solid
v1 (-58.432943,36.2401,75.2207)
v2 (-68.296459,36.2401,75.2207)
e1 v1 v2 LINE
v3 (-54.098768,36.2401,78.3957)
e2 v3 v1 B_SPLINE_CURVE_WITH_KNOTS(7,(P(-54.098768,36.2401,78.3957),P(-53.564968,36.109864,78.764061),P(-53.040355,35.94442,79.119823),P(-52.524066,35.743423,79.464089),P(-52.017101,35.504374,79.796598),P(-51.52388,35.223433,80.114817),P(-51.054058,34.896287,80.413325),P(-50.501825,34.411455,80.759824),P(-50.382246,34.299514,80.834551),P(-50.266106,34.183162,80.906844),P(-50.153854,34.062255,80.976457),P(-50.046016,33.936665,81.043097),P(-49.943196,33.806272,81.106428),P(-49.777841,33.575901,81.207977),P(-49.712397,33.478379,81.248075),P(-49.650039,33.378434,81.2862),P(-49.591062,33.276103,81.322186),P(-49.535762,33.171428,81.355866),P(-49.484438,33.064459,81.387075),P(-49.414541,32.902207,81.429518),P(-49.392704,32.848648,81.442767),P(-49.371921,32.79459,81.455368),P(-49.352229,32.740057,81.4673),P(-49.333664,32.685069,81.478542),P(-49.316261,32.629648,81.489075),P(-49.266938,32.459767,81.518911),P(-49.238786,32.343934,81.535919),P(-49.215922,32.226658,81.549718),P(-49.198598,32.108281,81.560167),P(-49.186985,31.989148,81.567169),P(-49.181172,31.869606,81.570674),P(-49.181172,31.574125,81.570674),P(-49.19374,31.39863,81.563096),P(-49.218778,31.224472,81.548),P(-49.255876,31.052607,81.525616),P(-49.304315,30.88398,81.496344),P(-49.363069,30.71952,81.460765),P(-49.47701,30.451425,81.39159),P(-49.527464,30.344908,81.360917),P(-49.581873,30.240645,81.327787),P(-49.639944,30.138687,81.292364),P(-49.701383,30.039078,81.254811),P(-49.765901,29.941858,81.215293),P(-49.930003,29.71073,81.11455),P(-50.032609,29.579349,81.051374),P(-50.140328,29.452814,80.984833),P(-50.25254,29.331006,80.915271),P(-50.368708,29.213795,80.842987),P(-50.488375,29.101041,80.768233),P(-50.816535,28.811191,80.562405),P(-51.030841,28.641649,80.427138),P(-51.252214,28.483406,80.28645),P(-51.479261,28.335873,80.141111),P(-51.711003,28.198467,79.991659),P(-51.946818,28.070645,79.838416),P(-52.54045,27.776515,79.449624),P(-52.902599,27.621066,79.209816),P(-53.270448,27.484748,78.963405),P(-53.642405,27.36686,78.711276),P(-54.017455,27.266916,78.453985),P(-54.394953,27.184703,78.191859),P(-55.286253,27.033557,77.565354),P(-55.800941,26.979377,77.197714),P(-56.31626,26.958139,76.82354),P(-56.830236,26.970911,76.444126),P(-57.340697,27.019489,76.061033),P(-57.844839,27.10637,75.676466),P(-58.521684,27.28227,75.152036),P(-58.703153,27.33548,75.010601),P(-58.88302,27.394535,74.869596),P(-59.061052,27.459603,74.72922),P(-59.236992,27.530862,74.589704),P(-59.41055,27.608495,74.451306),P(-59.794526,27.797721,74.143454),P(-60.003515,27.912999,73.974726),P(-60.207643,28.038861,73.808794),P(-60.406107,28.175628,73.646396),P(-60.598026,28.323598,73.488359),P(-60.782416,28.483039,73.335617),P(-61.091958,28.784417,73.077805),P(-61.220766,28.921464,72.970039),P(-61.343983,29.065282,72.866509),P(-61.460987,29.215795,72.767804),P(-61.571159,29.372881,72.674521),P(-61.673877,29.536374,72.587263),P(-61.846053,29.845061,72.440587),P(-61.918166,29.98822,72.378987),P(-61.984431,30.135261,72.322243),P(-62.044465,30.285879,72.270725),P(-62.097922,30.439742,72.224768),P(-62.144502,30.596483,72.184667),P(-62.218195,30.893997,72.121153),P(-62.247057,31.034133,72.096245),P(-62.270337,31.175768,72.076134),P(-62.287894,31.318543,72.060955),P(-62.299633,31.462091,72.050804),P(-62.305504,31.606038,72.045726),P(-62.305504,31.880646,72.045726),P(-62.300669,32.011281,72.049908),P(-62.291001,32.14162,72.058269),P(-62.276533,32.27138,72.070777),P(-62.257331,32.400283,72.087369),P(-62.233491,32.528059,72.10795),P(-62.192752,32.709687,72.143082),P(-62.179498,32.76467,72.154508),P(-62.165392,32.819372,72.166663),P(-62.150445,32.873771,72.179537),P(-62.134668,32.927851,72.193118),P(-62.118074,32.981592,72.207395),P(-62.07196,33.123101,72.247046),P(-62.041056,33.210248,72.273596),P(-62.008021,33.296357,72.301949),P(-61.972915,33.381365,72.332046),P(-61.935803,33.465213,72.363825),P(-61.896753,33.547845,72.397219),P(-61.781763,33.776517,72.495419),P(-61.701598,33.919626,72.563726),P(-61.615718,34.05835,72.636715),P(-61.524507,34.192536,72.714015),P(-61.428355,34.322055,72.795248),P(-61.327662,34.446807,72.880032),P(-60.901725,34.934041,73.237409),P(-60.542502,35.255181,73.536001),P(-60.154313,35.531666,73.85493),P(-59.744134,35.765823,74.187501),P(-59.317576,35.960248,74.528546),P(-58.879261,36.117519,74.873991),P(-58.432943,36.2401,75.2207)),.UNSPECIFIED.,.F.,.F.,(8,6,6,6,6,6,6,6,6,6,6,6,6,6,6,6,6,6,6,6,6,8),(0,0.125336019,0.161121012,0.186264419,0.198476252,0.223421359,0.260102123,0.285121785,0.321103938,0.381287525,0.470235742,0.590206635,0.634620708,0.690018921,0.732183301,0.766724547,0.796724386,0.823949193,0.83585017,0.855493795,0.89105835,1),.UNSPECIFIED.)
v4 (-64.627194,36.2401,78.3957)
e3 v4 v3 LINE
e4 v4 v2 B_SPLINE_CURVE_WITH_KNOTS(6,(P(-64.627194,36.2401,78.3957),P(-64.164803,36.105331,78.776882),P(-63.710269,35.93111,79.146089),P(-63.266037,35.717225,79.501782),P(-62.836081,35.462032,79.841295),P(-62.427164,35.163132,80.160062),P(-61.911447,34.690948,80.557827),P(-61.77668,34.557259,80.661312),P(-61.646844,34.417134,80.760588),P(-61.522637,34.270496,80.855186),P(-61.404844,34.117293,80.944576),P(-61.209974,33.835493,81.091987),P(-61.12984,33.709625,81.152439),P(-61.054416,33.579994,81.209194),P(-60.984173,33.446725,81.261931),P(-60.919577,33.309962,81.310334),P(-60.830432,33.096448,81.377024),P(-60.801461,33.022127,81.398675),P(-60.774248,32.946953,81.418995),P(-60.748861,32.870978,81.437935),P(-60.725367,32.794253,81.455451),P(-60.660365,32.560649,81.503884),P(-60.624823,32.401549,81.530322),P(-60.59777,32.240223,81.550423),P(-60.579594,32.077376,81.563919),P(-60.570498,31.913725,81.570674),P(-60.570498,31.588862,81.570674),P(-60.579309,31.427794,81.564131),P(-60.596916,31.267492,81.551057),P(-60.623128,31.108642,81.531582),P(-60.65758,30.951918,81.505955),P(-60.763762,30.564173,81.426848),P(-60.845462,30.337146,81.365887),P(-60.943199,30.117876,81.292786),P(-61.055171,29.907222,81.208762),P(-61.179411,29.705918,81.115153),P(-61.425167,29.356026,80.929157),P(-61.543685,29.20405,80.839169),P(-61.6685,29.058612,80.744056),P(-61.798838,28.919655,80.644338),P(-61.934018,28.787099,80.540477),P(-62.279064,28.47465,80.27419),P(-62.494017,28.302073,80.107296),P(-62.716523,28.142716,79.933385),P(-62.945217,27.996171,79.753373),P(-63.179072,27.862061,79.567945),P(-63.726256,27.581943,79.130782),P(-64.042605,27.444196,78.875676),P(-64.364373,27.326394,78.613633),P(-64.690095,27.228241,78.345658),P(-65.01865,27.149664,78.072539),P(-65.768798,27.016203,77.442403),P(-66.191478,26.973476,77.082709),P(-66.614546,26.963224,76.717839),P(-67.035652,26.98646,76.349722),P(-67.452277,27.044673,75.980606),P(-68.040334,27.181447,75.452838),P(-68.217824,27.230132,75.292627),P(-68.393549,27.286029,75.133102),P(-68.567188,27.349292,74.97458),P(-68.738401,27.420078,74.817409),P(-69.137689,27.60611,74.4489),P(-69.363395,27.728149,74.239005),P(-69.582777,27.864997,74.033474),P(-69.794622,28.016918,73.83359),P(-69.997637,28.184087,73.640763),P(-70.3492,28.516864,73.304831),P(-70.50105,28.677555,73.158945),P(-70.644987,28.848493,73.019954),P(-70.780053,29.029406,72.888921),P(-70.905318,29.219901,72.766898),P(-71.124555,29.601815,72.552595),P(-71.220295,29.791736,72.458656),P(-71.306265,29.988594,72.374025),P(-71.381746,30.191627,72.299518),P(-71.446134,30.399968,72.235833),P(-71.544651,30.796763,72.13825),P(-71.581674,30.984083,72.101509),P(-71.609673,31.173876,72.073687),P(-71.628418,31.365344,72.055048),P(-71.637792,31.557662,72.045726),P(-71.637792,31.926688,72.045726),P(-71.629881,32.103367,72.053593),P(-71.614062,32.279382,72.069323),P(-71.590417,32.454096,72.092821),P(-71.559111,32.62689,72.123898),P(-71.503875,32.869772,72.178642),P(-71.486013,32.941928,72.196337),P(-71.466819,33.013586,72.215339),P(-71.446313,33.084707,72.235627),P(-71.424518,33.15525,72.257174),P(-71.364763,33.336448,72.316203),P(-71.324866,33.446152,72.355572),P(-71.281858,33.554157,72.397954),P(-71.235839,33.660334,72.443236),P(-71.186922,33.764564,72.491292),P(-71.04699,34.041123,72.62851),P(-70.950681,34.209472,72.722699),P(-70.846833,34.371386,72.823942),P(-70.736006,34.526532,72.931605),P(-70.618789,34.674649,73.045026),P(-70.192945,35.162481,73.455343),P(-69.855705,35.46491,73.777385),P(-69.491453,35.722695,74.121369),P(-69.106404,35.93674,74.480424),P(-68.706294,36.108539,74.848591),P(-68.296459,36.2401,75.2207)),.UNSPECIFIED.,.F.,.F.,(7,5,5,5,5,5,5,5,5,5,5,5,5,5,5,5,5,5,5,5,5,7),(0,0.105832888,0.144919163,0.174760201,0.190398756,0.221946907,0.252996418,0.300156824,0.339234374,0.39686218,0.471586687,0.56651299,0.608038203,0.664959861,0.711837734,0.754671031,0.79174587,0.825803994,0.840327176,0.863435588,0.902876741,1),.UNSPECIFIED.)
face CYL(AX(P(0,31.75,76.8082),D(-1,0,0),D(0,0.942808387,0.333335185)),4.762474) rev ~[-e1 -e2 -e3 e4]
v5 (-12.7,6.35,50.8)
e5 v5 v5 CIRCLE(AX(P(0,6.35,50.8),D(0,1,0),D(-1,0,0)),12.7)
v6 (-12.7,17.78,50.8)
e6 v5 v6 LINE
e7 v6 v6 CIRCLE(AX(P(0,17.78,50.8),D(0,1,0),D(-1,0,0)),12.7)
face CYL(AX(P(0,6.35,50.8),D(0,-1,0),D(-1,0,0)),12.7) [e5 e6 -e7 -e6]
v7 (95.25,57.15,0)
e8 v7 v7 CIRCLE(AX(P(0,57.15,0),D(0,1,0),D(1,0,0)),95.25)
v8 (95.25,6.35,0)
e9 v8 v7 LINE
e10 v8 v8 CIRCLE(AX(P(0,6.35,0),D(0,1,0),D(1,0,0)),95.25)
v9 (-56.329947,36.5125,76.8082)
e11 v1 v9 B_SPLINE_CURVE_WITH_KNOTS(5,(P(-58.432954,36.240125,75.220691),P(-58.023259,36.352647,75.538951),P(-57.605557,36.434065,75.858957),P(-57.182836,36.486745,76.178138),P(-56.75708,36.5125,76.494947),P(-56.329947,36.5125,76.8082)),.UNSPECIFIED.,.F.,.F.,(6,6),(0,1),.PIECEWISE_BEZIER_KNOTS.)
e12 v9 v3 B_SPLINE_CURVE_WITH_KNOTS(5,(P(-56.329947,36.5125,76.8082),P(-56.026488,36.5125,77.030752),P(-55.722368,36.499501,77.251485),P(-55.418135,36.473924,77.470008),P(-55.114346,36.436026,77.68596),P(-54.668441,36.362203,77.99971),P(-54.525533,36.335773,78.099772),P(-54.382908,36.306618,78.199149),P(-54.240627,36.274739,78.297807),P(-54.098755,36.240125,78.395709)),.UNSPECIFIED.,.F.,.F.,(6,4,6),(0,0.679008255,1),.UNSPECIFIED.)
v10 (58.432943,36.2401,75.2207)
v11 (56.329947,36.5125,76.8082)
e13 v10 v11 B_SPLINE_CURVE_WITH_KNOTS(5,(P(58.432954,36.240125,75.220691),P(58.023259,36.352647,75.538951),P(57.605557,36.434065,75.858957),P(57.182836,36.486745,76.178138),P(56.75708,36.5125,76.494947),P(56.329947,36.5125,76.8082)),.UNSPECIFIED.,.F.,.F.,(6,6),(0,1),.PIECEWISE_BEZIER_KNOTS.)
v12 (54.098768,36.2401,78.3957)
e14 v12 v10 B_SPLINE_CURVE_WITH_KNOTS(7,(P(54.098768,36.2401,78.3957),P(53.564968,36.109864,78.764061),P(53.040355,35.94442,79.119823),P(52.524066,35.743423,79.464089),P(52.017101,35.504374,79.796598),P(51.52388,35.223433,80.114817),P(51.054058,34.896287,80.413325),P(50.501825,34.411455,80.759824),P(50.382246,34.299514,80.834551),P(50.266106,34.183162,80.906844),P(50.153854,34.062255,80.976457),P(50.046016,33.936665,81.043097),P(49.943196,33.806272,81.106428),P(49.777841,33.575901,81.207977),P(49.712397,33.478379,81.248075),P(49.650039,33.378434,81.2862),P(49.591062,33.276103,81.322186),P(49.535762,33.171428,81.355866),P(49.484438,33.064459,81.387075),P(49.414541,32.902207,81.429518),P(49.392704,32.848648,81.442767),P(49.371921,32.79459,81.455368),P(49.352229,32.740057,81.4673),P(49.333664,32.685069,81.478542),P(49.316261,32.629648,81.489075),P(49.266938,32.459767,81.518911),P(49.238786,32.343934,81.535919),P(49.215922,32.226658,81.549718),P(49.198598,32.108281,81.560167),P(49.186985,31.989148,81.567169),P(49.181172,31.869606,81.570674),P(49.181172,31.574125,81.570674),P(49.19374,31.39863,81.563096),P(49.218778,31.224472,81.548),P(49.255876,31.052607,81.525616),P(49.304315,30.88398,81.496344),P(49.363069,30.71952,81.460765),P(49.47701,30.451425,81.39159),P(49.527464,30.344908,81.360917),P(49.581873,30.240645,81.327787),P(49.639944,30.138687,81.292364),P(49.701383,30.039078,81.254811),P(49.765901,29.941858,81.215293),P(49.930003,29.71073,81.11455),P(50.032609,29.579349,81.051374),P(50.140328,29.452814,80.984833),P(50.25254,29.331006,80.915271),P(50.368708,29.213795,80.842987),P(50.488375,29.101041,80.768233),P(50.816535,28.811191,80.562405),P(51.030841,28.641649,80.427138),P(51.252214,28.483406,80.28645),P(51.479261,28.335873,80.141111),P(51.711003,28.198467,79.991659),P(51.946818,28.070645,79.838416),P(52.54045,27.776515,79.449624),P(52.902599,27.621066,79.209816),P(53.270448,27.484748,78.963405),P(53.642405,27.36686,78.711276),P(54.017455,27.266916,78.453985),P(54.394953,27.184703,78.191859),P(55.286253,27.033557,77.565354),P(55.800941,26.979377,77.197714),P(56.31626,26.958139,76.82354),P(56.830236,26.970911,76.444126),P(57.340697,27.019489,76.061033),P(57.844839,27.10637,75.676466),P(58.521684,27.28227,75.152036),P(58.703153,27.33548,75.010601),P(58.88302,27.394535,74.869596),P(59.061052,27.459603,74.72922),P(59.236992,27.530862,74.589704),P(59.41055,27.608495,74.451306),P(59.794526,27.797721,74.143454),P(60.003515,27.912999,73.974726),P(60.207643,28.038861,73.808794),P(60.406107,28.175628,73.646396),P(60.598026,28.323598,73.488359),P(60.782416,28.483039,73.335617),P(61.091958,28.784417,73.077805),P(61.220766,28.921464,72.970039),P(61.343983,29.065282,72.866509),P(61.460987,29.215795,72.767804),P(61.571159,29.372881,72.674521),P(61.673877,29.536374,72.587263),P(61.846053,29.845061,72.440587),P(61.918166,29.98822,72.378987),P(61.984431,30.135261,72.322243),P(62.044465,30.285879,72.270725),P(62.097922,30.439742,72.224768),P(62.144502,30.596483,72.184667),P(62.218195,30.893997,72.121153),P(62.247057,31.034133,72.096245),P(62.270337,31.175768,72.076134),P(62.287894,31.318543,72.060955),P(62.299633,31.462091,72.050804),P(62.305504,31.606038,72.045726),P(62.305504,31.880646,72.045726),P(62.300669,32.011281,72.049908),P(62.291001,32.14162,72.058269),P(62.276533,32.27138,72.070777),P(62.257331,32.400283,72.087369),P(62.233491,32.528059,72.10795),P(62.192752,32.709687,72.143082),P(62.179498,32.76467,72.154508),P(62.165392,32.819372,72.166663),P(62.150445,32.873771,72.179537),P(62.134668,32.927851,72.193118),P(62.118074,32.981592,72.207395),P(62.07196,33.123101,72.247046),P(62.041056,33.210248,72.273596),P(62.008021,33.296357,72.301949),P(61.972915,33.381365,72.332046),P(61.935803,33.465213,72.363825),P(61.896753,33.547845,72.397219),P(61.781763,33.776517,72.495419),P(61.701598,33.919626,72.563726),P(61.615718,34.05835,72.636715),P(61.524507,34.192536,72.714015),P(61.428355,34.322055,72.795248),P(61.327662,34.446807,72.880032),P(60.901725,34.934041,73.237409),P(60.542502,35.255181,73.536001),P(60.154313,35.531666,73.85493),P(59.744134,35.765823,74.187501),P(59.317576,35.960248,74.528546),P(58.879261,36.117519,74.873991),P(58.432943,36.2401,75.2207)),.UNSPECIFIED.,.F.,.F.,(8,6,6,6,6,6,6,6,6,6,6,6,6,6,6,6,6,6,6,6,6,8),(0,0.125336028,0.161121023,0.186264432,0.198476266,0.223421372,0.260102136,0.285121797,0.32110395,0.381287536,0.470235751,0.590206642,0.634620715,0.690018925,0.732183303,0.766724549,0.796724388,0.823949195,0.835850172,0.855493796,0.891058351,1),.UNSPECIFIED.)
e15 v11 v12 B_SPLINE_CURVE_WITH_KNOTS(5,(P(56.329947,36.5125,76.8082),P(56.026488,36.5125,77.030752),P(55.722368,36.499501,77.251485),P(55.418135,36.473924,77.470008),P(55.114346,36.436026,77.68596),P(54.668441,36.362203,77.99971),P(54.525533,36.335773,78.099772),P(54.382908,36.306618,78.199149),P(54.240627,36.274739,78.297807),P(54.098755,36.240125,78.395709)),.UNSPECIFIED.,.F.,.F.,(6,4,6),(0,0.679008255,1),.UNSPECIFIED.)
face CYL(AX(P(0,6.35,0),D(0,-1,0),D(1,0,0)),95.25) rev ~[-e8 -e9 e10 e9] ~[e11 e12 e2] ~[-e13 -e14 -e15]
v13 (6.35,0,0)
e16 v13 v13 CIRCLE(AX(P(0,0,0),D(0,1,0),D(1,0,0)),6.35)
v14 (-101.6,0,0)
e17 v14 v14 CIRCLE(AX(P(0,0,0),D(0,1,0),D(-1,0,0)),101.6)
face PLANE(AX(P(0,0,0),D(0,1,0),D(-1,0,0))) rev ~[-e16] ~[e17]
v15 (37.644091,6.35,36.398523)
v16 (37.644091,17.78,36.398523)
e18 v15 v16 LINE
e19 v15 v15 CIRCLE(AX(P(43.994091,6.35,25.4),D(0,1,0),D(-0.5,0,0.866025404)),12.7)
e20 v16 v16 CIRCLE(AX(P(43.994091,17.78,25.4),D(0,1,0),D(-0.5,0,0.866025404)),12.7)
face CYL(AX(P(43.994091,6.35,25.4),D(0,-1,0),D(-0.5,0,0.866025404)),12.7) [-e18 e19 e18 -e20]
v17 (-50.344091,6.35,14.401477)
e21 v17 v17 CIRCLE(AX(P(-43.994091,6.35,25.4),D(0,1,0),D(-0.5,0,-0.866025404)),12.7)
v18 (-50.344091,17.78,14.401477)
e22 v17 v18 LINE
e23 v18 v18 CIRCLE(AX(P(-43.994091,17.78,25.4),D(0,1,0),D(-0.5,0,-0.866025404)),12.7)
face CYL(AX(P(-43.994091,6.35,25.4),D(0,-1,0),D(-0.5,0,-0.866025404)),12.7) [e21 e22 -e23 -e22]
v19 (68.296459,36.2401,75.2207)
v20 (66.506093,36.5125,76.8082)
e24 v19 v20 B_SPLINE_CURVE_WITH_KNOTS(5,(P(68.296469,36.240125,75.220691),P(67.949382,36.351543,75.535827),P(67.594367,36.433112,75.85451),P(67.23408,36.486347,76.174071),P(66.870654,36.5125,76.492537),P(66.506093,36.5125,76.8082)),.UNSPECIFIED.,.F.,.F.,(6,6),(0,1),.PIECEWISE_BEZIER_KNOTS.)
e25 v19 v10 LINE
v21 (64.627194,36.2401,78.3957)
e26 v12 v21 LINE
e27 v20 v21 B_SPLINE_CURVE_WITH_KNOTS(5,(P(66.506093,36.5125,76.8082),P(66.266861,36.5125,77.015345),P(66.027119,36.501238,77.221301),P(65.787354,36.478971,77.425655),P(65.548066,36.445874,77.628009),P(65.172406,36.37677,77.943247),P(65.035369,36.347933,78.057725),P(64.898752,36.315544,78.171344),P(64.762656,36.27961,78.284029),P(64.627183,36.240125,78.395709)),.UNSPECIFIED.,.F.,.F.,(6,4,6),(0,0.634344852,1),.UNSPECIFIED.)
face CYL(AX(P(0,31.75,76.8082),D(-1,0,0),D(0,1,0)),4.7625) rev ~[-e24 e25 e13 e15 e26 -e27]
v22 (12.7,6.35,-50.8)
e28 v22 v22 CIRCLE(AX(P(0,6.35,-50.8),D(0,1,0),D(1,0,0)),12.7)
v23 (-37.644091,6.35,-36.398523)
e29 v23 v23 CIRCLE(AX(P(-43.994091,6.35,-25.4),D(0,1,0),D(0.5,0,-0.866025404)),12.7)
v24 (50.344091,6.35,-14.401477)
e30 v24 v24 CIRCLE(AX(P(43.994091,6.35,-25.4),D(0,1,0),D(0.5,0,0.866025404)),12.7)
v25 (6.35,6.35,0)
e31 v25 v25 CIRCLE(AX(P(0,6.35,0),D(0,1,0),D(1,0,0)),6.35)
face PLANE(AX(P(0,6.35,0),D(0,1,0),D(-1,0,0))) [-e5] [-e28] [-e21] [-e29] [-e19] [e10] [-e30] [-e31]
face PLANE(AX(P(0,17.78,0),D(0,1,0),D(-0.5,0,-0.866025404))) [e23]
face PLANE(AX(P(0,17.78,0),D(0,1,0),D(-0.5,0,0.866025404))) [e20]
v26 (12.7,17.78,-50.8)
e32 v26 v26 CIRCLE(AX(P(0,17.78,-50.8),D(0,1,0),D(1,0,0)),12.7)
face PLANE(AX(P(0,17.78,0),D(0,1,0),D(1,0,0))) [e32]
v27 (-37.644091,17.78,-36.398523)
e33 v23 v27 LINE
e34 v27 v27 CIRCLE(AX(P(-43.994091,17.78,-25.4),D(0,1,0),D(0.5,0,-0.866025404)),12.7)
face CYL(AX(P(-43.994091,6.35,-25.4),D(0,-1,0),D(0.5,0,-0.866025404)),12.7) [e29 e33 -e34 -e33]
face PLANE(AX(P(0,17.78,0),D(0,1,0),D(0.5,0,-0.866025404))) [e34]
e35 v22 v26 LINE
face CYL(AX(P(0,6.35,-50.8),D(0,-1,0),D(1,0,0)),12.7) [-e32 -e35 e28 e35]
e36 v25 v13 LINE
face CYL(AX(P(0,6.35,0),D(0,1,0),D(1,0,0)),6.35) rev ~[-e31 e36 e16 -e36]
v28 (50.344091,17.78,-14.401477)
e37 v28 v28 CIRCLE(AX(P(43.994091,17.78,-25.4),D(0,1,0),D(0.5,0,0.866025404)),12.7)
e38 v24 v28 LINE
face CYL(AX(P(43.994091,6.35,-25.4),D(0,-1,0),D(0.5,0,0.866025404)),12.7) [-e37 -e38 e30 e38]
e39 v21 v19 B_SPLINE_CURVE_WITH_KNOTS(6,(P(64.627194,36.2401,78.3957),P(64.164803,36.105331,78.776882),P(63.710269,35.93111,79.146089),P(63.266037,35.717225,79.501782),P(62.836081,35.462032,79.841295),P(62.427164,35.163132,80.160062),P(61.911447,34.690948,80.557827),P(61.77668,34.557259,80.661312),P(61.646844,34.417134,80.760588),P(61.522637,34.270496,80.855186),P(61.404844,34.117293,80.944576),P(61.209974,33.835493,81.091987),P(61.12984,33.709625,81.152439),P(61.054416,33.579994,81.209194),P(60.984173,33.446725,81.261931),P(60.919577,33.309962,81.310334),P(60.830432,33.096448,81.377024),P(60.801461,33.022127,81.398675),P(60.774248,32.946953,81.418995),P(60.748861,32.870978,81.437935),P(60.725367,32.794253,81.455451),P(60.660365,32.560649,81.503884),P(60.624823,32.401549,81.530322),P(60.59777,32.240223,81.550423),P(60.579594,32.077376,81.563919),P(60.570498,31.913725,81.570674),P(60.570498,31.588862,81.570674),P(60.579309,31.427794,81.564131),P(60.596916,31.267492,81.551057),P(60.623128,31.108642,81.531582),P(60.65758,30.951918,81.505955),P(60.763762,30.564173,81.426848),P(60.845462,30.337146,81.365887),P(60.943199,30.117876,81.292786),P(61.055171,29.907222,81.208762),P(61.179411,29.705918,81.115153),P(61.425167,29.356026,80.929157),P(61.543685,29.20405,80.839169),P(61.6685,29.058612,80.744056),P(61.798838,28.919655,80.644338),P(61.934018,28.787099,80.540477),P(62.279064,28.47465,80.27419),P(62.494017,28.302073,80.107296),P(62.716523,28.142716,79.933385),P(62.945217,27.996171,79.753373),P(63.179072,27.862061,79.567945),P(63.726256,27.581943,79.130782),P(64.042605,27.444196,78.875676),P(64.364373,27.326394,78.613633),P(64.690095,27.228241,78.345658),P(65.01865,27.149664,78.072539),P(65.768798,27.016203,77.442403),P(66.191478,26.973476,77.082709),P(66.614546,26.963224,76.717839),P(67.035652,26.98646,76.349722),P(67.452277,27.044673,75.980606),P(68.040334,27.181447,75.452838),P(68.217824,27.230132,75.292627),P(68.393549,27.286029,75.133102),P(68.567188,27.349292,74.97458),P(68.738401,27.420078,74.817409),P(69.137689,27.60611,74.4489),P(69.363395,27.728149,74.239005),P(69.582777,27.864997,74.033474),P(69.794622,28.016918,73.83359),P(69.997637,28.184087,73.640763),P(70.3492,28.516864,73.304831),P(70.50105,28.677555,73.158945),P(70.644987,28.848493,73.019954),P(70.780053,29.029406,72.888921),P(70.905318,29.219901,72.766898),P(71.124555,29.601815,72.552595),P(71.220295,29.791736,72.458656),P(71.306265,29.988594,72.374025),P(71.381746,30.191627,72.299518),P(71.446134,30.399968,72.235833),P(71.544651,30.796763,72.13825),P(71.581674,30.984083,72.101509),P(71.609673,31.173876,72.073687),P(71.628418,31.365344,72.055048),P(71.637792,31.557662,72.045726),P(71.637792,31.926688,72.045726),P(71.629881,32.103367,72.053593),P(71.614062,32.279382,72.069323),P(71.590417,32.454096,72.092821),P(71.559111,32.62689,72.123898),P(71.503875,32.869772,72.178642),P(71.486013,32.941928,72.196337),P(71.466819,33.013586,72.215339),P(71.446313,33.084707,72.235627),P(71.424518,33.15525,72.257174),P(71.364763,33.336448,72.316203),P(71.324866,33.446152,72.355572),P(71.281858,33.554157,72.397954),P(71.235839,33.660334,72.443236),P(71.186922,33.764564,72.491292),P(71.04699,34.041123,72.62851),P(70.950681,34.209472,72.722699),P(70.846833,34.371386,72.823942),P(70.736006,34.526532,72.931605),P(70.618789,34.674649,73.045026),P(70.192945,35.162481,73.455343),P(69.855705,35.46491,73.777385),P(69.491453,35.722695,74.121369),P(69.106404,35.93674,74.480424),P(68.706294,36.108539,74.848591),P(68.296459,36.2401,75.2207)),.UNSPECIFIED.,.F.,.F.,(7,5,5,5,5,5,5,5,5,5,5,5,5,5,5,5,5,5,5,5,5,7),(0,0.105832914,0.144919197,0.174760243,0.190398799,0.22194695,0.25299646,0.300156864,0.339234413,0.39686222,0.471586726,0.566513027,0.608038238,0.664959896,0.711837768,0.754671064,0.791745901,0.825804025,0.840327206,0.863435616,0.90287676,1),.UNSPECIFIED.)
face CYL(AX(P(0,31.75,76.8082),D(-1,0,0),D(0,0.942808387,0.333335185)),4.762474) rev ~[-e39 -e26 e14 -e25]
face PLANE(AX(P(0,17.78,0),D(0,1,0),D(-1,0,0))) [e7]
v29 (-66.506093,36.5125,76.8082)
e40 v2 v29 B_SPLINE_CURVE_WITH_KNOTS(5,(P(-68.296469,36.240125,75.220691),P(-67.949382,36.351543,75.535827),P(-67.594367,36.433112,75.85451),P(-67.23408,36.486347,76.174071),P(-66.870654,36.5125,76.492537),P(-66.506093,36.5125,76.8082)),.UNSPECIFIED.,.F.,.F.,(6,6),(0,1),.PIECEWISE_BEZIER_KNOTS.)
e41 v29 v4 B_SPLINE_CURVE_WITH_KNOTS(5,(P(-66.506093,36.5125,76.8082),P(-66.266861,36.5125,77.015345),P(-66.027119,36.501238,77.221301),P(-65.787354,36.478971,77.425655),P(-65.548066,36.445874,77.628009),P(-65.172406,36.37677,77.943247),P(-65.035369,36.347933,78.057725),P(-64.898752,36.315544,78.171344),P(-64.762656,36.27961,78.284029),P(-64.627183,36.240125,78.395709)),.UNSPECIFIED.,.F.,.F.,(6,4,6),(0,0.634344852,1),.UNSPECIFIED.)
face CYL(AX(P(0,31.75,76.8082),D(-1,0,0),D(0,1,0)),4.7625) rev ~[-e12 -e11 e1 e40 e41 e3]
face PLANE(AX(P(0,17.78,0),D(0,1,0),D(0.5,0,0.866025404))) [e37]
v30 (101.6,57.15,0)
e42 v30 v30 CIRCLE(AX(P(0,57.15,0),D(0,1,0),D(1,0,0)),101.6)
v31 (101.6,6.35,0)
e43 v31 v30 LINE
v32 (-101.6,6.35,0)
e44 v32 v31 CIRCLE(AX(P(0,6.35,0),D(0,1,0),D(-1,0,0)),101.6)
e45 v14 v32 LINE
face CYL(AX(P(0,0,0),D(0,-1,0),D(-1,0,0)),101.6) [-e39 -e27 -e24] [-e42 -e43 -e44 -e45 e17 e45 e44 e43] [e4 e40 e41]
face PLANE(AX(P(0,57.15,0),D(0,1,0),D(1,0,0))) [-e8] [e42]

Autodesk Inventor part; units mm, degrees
ref_plane "YZ Plane" through (0, 0, 0) normal (1, 0, 0) x (0, 1, 0)
ref_plane "XZ Plane" through (0, 0, 0) normal (0, 1, 0) x (-1, 0, 0)
ref_plane "XY Plane" through (0, 0, 0) normal (0, 0, 1) x (1, 0, 0)
sketch "Sketch1" plane through (0, 0, 0) normal (0, 1, 0) x (-1, 0, 0)
  circle A0 centre (0, 0) radius 101.6
  dimension "baseOutsideDiameter" = 203.2
extrude "Extrusion1" add sketch "Sketch1" along normal blind 6.35
sketch "Sketch2" plane through (0, 6.35, 0) normal (0, 1, 0) x (1, 0, 0)
  circle A0 centre (0, 0) radius 101.6
  circle A1 centre (0, 0) radius 95.25
  dimension "d4" = 6.35
  dimension "d5" = 203.2
extrude "Extrusion2" add sketch "Sketch2" along normal blind 50.8
sketch "Sketch3" plane through (0, 6.35, 0) normal (0, 1, 0) x (1, 0, 0)
  circle A0 centre (0, 0) radius 6.35
  dimension "wormDriveDiameer" = 12.7
extrude "Extrusion3" cut sketch "Sketch3" against normal through all
sketch "Sketch5" plane through (0, 6.35, 0) normal (0, 1, 0) x (1, 0, 0)
  circle A0 centre (0, 50.8) radius 12.7
  point P0 (0, 0)
  dimension "wormGearSupportBaseDiameter" = 25.4
  dimension "radiusOfGearSupports" = 50.8
extrude "Extrusion5" add sketch "Sketch5" along normal blind 11.43
pattern_circular "Circular Pattern1" count 6 over 360 about axis through (0, -10, 0) along (0, 1, 0) of "Extrusion5"
sketch "Sketch6" plane through (0, 0, 0) normal (1, 0, 0) x (0, 1, 0)
  arc A0 (36.2401, 78.3957) -> (36.2401, 75.2207) centre (31.75, 76.8082) ccw projected
  circle A1 centre (31.75, 76.8082) radius 4.7625
  point P0 (0, 0)
extrude "Extrusion6" cut sketch "Sketch6" along normal through all both and the other way through all
equation "\"d4\" = baseThickness"
equation "\"d5\" = baseOutsideDiameter"
equation "\"baseThickness\" = 6.35"
properties part number "baseV01"
